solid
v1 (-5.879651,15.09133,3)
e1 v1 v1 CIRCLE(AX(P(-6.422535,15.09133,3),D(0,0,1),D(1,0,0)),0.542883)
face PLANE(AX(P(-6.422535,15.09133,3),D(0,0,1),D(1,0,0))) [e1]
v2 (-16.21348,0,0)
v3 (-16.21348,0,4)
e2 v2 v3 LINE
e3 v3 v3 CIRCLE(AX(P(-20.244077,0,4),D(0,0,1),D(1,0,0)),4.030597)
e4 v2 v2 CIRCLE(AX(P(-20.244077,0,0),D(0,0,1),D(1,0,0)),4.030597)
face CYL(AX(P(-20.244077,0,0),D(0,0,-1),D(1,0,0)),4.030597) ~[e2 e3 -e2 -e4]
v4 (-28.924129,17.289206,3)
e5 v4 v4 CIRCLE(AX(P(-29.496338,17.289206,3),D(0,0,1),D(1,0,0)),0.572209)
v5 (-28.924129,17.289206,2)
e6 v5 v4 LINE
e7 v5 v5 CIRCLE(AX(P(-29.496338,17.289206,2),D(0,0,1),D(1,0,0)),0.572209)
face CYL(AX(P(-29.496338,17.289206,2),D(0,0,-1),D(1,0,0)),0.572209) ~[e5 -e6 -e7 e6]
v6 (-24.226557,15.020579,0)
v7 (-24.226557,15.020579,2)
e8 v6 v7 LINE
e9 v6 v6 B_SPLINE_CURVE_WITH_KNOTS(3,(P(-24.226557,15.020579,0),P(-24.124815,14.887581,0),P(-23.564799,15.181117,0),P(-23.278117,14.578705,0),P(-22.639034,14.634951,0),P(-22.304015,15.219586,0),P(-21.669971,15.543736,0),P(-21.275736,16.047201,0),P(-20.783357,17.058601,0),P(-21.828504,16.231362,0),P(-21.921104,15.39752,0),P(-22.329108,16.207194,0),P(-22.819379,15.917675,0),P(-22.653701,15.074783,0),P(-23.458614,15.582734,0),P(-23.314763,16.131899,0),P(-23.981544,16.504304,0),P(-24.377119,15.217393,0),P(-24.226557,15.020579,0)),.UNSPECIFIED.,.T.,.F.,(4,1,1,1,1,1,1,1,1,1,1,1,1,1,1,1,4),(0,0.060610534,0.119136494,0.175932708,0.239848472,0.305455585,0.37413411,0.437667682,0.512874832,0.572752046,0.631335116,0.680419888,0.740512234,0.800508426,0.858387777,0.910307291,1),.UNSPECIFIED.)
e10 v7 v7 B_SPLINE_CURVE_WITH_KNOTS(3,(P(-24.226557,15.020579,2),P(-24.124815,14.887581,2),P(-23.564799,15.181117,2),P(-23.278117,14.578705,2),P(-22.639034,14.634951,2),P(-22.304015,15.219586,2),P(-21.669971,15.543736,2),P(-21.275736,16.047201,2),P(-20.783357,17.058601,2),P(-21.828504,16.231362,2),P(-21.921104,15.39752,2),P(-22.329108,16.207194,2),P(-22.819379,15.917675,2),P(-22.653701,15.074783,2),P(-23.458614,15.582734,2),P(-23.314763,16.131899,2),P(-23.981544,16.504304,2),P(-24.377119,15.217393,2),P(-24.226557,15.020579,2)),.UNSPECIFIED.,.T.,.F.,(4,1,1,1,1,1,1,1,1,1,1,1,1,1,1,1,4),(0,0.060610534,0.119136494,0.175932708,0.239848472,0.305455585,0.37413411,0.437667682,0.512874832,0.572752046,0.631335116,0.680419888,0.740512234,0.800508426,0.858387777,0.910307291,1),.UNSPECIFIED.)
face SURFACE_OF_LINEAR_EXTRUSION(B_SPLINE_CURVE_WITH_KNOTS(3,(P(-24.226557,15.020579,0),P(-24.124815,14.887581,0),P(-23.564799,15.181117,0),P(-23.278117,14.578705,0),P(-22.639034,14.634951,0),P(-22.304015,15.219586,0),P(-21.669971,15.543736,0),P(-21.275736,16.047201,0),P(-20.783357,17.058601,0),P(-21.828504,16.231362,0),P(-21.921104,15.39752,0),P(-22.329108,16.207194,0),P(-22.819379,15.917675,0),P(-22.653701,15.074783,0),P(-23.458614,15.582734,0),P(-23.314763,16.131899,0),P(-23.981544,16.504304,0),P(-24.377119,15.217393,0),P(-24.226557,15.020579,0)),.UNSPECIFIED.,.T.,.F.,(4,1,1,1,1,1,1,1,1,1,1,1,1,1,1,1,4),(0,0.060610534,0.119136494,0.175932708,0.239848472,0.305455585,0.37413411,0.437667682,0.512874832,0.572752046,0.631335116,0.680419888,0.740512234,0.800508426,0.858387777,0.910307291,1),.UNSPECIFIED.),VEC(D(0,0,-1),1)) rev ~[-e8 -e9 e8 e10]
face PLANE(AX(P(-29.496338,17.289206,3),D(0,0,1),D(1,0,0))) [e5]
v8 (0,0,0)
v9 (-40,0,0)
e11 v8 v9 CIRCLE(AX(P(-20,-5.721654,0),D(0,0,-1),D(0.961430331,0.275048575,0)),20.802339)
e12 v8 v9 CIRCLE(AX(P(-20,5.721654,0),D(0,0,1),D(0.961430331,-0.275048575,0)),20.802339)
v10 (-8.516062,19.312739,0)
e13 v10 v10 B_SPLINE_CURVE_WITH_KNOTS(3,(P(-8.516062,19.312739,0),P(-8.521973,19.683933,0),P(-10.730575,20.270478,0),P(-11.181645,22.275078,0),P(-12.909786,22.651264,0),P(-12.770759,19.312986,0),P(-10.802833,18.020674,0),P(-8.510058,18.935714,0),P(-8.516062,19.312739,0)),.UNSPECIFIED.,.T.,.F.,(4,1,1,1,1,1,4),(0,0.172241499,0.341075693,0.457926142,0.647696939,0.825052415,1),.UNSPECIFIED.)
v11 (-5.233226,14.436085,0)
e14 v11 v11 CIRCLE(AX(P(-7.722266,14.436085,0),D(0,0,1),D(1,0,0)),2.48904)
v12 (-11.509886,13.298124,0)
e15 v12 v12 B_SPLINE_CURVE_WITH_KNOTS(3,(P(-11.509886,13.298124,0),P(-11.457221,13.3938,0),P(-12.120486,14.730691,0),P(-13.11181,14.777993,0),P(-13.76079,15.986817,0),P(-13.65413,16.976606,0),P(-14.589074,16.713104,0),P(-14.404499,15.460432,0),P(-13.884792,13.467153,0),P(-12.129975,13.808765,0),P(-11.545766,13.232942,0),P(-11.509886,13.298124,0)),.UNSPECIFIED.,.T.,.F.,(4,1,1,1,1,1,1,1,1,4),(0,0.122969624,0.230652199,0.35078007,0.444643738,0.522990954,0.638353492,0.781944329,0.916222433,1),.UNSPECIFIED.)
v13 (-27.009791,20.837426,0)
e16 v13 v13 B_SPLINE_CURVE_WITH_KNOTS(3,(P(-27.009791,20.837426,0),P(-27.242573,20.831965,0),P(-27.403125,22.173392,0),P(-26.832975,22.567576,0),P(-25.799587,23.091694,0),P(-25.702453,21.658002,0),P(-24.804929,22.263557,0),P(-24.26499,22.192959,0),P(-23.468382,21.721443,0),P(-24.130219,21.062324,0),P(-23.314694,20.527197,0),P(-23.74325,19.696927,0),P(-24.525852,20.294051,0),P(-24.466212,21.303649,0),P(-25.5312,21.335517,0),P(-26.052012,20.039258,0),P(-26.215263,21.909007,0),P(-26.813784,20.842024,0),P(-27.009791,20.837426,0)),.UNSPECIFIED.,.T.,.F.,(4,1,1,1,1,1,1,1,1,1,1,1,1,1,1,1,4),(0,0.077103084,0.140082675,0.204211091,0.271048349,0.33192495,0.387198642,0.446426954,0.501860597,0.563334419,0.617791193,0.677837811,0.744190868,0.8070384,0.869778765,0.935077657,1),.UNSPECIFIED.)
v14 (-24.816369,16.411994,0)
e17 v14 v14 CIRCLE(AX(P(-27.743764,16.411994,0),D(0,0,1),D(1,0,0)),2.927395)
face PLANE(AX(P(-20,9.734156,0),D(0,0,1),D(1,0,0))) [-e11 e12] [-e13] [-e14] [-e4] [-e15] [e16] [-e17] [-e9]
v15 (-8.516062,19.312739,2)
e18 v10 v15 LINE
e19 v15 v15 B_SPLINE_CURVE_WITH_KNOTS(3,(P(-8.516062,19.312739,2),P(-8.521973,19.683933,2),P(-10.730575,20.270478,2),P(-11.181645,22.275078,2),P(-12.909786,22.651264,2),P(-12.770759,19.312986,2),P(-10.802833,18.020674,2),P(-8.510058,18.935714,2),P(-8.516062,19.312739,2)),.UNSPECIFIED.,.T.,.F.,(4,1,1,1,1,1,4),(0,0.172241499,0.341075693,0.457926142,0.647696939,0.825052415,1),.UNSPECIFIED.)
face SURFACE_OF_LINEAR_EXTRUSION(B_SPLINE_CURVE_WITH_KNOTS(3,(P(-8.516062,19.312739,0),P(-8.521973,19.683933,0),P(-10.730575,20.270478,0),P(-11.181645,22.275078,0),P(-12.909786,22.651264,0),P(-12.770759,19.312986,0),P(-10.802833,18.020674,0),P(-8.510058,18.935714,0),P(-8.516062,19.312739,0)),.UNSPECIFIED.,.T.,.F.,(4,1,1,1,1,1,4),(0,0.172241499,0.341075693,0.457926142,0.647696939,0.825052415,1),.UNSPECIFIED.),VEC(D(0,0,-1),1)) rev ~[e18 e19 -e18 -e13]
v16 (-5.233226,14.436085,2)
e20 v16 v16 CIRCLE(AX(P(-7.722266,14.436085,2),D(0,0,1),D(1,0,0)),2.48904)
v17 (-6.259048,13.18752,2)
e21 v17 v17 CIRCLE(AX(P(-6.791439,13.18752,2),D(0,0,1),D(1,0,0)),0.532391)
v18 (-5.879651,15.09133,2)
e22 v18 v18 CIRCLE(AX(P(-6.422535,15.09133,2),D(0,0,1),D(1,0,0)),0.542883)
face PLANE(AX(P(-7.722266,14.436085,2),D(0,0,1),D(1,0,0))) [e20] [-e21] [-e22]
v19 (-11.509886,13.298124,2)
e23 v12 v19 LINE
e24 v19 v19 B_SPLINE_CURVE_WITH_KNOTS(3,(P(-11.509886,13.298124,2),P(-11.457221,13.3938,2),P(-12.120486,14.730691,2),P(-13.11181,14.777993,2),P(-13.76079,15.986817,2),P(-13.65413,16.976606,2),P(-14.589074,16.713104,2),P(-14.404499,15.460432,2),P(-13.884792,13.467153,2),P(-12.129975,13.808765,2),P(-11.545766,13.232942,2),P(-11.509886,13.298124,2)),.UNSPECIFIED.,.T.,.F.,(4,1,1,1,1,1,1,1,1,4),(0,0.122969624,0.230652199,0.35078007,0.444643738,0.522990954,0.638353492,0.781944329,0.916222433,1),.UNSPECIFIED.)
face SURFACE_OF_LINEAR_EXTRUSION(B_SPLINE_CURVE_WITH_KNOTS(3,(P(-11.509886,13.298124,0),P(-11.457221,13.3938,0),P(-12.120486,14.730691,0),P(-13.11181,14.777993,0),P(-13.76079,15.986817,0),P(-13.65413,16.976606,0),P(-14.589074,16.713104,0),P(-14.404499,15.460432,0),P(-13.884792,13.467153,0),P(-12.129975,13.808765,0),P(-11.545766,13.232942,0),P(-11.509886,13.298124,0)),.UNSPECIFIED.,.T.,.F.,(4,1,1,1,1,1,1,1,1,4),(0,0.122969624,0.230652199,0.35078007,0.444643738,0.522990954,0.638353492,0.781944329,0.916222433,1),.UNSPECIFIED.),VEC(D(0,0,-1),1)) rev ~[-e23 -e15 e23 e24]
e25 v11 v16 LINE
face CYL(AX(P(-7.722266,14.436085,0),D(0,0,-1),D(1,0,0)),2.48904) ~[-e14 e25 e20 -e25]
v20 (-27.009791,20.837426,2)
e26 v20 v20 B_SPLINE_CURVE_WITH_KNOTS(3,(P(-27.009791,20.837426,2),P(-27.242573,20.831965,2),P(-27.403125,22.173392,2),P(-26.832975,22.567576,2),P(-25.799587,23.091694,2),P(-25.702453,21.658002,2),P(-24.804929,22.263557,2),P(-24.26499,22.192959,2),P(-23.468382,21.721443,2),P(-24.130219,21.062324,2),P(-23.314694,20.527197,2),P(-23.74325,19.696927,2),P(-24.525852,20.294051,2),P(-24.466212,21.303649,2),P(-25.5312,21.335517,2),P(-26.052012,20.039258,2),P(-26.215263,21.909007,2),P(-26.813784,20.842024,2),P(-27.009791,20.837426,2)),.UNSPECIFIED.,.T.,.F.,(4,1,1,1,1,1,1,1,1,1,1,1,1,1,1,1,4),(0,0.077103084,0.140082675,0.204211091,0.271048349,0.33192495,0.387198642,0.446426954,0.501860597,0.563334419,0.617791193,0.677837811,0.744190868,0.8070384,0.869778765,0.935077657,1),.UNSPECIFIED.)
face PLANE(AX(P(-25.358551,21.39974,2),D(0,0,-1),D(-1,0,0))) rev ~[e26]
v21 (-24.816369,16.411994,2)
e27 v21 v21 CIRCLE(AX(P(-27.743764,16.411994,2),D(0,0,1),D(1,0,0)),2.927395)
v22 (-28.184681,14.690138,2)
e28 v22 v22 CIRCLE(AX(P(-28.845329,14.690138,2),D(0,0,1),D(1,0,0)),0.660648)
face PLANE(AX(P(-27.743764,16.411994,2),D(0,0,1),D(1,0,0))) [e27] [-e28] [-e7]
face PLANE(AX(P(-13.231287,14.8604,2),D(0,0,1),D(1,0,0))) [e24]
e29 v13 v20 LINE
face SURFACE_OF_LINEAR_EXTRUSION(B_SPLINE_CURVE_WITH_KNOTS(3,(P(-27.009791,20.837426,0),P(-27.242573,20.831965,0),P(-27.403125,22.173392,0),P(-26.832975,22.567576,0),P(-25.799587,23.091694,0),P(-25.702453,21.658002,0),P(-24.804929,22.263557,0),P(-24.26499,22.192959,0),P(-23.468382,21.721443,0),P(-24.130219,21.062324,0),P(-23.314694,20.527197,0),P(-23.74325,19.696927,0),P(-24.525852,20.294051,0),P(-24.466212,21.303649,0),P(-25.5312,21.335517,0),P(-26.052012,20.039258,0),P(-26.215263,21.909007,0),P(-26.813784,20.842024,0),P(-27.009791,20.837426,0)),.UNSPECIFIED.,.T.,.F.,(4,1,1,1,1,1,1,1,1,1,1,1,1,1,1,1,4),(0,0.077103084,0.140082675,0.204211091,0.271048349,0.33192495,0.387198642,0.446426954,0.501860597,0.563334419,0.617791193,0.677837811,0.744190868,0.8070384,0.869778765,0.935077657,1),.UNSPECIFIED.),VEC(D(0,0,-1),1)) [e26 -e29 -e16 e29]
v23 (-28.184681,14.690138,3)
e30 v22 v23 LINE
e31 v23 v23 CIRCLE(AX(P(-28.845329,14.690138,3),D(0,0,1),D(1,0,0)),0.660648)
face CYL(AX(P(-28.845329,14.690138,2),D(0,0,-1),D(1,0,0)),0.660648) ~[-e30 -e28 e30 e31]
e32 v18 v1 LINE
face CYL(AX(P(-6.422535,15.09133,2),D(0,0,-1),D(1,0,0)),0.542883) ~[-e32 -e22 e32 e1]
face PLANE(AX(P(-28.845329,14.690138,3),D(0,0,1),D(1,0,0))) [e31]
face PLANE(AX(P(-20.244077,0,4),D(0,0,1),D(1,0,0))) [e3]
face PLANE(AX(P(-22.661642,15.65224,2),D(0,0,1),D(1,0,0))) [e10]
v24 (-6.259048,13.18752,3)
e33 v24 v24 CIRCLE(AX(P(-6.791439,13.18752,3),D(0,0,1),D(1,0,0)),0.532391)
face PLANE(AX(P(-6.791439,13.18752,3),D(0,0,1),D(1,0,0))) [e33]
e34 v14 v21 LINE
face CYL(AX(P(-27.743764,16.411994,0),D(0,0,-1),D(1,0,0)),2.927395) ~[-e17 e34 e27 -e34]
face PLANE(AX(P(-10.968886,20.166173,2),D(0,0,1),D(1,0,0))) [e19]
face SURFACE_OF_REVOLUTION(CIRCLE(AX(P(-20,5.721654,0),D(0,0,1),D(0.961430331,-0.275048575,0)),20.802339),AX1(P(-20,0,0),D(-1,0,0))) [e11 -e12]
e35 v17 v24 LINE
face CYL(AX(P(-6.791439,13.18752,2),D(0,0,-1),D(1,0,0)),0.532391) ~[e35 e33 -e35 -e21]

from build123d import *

# Parameters (mm, degrees)
F1_ANGLE  = 180
F2_R      = 4.0305965855
F3_DEPTH  = 4
F7_R      = 2.4890400521
F8_DEPTH  = 2
F9_R      = 2.92739538
F10_DEPTH = 2
F12_R     = 0.5323906091
F13_DEPTH = 1
F14_R     = 0.5428831827
F15_DEPTH = 1
F17_R     = 0.660648137
F18_DEPTH = 1
F19_R     = 0.572209203
F20_DEPTH = 1
F22_DEPTH = 2
F24_DEPTH = 2
F26_DEPTH = 2
F28_DEPTH = 2


# Not quite as in the source:
# - the program builds the solid bodies; features that only make, move or delete a surface that nothing else refers to are left out


with BuildPart() as f1:
    # F0 (on Top) → F1 (revolve)
    with BuildSketch(Plane.XY):
        with BuildLine():
            Line((-40, 0), (0, 0))
            ThreePointArc((0, 0), (-20, 26.5239931319), (-40, 0))
        make_face()
    revolve(axis=Axis((-20, 0, 0), (-1, 0, 0)), revolution_arc=F1_ANGLE)

    # F2 (on Top) → F3 (join)
    with BuildSketch(Plane.XY):
        with Locations((-20.244076848, 0)):
            Circle(F2_R)
    extrude(amount=F3_DEPTH)

    # F7 (on face) → F8 (join)
    with BuildSketch(Plane.XY):
        with Locations((-7.7222660184, 14.4360847771)):
            Circle(F7_R)
    extrude(amount=F8_DEPTH)

    # F9 (on face) → F10 (join)
    with BuildSketch(Plane.XY):
        with Locations((-27.7437642217, 16.4119936526)):
            Circle(F9_R)
    extrude(amount=F10_DEPTH)

    # F12 (on face) → F13 (join)
    with BuildSketch(Plane.XY.offset(2)):
        with Locations((-6.7914389074, 13.187520206)):
            Circle(F12_R)
    extrude(amount=F13_DEPTH)

    # F14 (on face) → F15 (join)
    with BuildSketch(Plane.XY.offset(2)):
        with Locations((-6.422534585, 15.091329813)):
            Circle(F14_R)
    extrude(amount=F15_DEPTH)

    # F17 (on face) → F18 (join)
    with BuildSketch(Plane.XY.offset(2)):
        with Locations((-28.8453288376, 14.6901383996)):
            Circle(F17_R)
    extrude(amount=F18_DEPTH)

    # F19 (on face) → F20 (join)
    with BuildSketch(Plane.XY.offset(2)):
        with Locations((-29.4963382185, 17.2892063856)):
            Circle(F19_R)
    extrude(amount=F20_DEPTH)

    # F21 (on face) → F22 (join)
    with BuildSketch(Plane.XY):
        with BuildLine():
            add(Edge.make_bspline(
                [(-8.5160620511, 19.3127393723), (-8.521972931, 19.6839333445), (-10.7305748769, 20.2704778577), (-11.1816446669, 22.2750778583), (-12.9097861424, 22.6512643434), (-12.7707594725, 19.3129856124), (-10.8028333219, 18.0206741983), (-8.5100583053, 18.9357135717), (-8.5160620511, 19.3127393723)],
                knots=[0, 0, 0, 0, 0.1722414989, 0.3410756935, 0.4579261422, 0.6476969394, 0.825052415, 1, 1, 1, 1], degree=3))
        make_face()
    extrude(amount=F22_DEPTH)

    # F23 (on face) → F24 (join)
    with BuildSketch(Plane.XY):
        with BuildLine():
            add(Edge.make_bspline(
                [(-11.5098860115, 13.2981240749), (-11.457220893, 13.3937996973), (-12.1204864542, 14.7306910435), (-13.1118095158, 14.7779928006), (-13.7607902099, 15.9868173482), (-13.6541299737, 16.9766064821), (-14.5890741737, 16.7131041232), (-14.4044989561, 15.4604322823), (-13.8847921779, 13.4671527284), (-12.1299745641, 13.808764838), (-11.5457660553, 13.2329415476), (-11.5098860115, 13.2981240749)],
                knots=[0, 0, 0, 0, 0.1229696245, 0.2306521994, 0.3507800699, 0.4446437385, 0.522990954, 0.6383534919, 0.7819443294, 0.9162224325, 1, 1, 1, 1], degree=3))
        make_face()
    extrude(amount=F24_DEPTH)

    # F25 (on face) → F26 (join)
    with BuildSketch(Plane.XY):
        with BuildLine():
            add(Edge.make_bspline(
                [(-27.0097907633, 20.8374261856), (-27.2425727265, 20.8319652886), (-27.4031250895, 22.1733922891), (-26.8329748697, 22.5675757298), (-25.7995869833, 23.0916938033), (-25.7024529374, 21.6580021561), (-24.804928822, 22.2635565151), (-24.2649902936, 22.1929586914), (-23.4683819898, 21.7214432552), (-24.1302189882, 21.0623235273), (-23.3146935561, 20.5271971589), (-23.7432502692, 19.6969266917), (-24.5258521864, 20.2940513308), (-24.4662124217, 21.3036490589), (-25.5311996305, 21.3355170611), (-26.0520117333, 20.0392582092), (-26.2152630753, 21.9090074999), (-26.813783683, 20.8420243704), (-27.0097907633, 20.8374261856)],
                knots=[0, 0, 0, 0, 0.0771030843, 0.1400826747, 0.2042110914, 0.2710483491, 0.3319249501, 0.387198642, 0.4464269542, 0.5018605974, 0.563334419, 0.6177911928, 0.6778378112, 0.7441908676, 0.8070383996, 0.8697787648, 0.9350776572, 1, 1, 1, 1], degree=3))
        make_face()
    extrude(amount=F26_DEPTH)

    # F27 (on face) → F28 (join)
    with BuildSketch(Plane.XY):
        with BuildLine():
            add(Edge.make_bspline(
                [(-24.2265574634, 15.0205790997), (-24.1248145615, 14.8875807453), (-23.5647992126, 15.1811169827), (-23.2781166392, 14.5787051468), (-22.6390340236, 14.6349514416), (-22.3040150935, 15.2195858598), (-21.6699712546, 15.5437359225), (-21.2757359012, 16.0472006168), (-20.7833567862, 17.0586009621), (-21.8285044828, 16.2313624992), (-21.9211040318, 15.3975196089), (-22.3291080033, 16.2071935321), (-22.8193786359, 15.9176745538), (-22.6537006109, 15.0747834744), (-23.4586142076, 15.5827339886), (-23.314763112, 16.1318993459), (-23.9815444448, 16.5043044772), (-24.3771186928, 15.2173927876), (-24.2265574634, 15.0205790997)],
                knots=[0, 0, 0, 0, 0.0606105338, 0.1191364942, 0.1759327084, 0.2398484718, 0.3054555849, 0.3741341104, 0.437667682, 0.5128748319, 0.5727520461, 0.6313351165, 0.6804198879, 0.7405122341, 0.8005084259, 0.8583877769, 0.9103072911, 1, 1, 1, 1], degree=3))
        make_face()
    extrude(amount=F28_DEPTH)


solid = f1.part
